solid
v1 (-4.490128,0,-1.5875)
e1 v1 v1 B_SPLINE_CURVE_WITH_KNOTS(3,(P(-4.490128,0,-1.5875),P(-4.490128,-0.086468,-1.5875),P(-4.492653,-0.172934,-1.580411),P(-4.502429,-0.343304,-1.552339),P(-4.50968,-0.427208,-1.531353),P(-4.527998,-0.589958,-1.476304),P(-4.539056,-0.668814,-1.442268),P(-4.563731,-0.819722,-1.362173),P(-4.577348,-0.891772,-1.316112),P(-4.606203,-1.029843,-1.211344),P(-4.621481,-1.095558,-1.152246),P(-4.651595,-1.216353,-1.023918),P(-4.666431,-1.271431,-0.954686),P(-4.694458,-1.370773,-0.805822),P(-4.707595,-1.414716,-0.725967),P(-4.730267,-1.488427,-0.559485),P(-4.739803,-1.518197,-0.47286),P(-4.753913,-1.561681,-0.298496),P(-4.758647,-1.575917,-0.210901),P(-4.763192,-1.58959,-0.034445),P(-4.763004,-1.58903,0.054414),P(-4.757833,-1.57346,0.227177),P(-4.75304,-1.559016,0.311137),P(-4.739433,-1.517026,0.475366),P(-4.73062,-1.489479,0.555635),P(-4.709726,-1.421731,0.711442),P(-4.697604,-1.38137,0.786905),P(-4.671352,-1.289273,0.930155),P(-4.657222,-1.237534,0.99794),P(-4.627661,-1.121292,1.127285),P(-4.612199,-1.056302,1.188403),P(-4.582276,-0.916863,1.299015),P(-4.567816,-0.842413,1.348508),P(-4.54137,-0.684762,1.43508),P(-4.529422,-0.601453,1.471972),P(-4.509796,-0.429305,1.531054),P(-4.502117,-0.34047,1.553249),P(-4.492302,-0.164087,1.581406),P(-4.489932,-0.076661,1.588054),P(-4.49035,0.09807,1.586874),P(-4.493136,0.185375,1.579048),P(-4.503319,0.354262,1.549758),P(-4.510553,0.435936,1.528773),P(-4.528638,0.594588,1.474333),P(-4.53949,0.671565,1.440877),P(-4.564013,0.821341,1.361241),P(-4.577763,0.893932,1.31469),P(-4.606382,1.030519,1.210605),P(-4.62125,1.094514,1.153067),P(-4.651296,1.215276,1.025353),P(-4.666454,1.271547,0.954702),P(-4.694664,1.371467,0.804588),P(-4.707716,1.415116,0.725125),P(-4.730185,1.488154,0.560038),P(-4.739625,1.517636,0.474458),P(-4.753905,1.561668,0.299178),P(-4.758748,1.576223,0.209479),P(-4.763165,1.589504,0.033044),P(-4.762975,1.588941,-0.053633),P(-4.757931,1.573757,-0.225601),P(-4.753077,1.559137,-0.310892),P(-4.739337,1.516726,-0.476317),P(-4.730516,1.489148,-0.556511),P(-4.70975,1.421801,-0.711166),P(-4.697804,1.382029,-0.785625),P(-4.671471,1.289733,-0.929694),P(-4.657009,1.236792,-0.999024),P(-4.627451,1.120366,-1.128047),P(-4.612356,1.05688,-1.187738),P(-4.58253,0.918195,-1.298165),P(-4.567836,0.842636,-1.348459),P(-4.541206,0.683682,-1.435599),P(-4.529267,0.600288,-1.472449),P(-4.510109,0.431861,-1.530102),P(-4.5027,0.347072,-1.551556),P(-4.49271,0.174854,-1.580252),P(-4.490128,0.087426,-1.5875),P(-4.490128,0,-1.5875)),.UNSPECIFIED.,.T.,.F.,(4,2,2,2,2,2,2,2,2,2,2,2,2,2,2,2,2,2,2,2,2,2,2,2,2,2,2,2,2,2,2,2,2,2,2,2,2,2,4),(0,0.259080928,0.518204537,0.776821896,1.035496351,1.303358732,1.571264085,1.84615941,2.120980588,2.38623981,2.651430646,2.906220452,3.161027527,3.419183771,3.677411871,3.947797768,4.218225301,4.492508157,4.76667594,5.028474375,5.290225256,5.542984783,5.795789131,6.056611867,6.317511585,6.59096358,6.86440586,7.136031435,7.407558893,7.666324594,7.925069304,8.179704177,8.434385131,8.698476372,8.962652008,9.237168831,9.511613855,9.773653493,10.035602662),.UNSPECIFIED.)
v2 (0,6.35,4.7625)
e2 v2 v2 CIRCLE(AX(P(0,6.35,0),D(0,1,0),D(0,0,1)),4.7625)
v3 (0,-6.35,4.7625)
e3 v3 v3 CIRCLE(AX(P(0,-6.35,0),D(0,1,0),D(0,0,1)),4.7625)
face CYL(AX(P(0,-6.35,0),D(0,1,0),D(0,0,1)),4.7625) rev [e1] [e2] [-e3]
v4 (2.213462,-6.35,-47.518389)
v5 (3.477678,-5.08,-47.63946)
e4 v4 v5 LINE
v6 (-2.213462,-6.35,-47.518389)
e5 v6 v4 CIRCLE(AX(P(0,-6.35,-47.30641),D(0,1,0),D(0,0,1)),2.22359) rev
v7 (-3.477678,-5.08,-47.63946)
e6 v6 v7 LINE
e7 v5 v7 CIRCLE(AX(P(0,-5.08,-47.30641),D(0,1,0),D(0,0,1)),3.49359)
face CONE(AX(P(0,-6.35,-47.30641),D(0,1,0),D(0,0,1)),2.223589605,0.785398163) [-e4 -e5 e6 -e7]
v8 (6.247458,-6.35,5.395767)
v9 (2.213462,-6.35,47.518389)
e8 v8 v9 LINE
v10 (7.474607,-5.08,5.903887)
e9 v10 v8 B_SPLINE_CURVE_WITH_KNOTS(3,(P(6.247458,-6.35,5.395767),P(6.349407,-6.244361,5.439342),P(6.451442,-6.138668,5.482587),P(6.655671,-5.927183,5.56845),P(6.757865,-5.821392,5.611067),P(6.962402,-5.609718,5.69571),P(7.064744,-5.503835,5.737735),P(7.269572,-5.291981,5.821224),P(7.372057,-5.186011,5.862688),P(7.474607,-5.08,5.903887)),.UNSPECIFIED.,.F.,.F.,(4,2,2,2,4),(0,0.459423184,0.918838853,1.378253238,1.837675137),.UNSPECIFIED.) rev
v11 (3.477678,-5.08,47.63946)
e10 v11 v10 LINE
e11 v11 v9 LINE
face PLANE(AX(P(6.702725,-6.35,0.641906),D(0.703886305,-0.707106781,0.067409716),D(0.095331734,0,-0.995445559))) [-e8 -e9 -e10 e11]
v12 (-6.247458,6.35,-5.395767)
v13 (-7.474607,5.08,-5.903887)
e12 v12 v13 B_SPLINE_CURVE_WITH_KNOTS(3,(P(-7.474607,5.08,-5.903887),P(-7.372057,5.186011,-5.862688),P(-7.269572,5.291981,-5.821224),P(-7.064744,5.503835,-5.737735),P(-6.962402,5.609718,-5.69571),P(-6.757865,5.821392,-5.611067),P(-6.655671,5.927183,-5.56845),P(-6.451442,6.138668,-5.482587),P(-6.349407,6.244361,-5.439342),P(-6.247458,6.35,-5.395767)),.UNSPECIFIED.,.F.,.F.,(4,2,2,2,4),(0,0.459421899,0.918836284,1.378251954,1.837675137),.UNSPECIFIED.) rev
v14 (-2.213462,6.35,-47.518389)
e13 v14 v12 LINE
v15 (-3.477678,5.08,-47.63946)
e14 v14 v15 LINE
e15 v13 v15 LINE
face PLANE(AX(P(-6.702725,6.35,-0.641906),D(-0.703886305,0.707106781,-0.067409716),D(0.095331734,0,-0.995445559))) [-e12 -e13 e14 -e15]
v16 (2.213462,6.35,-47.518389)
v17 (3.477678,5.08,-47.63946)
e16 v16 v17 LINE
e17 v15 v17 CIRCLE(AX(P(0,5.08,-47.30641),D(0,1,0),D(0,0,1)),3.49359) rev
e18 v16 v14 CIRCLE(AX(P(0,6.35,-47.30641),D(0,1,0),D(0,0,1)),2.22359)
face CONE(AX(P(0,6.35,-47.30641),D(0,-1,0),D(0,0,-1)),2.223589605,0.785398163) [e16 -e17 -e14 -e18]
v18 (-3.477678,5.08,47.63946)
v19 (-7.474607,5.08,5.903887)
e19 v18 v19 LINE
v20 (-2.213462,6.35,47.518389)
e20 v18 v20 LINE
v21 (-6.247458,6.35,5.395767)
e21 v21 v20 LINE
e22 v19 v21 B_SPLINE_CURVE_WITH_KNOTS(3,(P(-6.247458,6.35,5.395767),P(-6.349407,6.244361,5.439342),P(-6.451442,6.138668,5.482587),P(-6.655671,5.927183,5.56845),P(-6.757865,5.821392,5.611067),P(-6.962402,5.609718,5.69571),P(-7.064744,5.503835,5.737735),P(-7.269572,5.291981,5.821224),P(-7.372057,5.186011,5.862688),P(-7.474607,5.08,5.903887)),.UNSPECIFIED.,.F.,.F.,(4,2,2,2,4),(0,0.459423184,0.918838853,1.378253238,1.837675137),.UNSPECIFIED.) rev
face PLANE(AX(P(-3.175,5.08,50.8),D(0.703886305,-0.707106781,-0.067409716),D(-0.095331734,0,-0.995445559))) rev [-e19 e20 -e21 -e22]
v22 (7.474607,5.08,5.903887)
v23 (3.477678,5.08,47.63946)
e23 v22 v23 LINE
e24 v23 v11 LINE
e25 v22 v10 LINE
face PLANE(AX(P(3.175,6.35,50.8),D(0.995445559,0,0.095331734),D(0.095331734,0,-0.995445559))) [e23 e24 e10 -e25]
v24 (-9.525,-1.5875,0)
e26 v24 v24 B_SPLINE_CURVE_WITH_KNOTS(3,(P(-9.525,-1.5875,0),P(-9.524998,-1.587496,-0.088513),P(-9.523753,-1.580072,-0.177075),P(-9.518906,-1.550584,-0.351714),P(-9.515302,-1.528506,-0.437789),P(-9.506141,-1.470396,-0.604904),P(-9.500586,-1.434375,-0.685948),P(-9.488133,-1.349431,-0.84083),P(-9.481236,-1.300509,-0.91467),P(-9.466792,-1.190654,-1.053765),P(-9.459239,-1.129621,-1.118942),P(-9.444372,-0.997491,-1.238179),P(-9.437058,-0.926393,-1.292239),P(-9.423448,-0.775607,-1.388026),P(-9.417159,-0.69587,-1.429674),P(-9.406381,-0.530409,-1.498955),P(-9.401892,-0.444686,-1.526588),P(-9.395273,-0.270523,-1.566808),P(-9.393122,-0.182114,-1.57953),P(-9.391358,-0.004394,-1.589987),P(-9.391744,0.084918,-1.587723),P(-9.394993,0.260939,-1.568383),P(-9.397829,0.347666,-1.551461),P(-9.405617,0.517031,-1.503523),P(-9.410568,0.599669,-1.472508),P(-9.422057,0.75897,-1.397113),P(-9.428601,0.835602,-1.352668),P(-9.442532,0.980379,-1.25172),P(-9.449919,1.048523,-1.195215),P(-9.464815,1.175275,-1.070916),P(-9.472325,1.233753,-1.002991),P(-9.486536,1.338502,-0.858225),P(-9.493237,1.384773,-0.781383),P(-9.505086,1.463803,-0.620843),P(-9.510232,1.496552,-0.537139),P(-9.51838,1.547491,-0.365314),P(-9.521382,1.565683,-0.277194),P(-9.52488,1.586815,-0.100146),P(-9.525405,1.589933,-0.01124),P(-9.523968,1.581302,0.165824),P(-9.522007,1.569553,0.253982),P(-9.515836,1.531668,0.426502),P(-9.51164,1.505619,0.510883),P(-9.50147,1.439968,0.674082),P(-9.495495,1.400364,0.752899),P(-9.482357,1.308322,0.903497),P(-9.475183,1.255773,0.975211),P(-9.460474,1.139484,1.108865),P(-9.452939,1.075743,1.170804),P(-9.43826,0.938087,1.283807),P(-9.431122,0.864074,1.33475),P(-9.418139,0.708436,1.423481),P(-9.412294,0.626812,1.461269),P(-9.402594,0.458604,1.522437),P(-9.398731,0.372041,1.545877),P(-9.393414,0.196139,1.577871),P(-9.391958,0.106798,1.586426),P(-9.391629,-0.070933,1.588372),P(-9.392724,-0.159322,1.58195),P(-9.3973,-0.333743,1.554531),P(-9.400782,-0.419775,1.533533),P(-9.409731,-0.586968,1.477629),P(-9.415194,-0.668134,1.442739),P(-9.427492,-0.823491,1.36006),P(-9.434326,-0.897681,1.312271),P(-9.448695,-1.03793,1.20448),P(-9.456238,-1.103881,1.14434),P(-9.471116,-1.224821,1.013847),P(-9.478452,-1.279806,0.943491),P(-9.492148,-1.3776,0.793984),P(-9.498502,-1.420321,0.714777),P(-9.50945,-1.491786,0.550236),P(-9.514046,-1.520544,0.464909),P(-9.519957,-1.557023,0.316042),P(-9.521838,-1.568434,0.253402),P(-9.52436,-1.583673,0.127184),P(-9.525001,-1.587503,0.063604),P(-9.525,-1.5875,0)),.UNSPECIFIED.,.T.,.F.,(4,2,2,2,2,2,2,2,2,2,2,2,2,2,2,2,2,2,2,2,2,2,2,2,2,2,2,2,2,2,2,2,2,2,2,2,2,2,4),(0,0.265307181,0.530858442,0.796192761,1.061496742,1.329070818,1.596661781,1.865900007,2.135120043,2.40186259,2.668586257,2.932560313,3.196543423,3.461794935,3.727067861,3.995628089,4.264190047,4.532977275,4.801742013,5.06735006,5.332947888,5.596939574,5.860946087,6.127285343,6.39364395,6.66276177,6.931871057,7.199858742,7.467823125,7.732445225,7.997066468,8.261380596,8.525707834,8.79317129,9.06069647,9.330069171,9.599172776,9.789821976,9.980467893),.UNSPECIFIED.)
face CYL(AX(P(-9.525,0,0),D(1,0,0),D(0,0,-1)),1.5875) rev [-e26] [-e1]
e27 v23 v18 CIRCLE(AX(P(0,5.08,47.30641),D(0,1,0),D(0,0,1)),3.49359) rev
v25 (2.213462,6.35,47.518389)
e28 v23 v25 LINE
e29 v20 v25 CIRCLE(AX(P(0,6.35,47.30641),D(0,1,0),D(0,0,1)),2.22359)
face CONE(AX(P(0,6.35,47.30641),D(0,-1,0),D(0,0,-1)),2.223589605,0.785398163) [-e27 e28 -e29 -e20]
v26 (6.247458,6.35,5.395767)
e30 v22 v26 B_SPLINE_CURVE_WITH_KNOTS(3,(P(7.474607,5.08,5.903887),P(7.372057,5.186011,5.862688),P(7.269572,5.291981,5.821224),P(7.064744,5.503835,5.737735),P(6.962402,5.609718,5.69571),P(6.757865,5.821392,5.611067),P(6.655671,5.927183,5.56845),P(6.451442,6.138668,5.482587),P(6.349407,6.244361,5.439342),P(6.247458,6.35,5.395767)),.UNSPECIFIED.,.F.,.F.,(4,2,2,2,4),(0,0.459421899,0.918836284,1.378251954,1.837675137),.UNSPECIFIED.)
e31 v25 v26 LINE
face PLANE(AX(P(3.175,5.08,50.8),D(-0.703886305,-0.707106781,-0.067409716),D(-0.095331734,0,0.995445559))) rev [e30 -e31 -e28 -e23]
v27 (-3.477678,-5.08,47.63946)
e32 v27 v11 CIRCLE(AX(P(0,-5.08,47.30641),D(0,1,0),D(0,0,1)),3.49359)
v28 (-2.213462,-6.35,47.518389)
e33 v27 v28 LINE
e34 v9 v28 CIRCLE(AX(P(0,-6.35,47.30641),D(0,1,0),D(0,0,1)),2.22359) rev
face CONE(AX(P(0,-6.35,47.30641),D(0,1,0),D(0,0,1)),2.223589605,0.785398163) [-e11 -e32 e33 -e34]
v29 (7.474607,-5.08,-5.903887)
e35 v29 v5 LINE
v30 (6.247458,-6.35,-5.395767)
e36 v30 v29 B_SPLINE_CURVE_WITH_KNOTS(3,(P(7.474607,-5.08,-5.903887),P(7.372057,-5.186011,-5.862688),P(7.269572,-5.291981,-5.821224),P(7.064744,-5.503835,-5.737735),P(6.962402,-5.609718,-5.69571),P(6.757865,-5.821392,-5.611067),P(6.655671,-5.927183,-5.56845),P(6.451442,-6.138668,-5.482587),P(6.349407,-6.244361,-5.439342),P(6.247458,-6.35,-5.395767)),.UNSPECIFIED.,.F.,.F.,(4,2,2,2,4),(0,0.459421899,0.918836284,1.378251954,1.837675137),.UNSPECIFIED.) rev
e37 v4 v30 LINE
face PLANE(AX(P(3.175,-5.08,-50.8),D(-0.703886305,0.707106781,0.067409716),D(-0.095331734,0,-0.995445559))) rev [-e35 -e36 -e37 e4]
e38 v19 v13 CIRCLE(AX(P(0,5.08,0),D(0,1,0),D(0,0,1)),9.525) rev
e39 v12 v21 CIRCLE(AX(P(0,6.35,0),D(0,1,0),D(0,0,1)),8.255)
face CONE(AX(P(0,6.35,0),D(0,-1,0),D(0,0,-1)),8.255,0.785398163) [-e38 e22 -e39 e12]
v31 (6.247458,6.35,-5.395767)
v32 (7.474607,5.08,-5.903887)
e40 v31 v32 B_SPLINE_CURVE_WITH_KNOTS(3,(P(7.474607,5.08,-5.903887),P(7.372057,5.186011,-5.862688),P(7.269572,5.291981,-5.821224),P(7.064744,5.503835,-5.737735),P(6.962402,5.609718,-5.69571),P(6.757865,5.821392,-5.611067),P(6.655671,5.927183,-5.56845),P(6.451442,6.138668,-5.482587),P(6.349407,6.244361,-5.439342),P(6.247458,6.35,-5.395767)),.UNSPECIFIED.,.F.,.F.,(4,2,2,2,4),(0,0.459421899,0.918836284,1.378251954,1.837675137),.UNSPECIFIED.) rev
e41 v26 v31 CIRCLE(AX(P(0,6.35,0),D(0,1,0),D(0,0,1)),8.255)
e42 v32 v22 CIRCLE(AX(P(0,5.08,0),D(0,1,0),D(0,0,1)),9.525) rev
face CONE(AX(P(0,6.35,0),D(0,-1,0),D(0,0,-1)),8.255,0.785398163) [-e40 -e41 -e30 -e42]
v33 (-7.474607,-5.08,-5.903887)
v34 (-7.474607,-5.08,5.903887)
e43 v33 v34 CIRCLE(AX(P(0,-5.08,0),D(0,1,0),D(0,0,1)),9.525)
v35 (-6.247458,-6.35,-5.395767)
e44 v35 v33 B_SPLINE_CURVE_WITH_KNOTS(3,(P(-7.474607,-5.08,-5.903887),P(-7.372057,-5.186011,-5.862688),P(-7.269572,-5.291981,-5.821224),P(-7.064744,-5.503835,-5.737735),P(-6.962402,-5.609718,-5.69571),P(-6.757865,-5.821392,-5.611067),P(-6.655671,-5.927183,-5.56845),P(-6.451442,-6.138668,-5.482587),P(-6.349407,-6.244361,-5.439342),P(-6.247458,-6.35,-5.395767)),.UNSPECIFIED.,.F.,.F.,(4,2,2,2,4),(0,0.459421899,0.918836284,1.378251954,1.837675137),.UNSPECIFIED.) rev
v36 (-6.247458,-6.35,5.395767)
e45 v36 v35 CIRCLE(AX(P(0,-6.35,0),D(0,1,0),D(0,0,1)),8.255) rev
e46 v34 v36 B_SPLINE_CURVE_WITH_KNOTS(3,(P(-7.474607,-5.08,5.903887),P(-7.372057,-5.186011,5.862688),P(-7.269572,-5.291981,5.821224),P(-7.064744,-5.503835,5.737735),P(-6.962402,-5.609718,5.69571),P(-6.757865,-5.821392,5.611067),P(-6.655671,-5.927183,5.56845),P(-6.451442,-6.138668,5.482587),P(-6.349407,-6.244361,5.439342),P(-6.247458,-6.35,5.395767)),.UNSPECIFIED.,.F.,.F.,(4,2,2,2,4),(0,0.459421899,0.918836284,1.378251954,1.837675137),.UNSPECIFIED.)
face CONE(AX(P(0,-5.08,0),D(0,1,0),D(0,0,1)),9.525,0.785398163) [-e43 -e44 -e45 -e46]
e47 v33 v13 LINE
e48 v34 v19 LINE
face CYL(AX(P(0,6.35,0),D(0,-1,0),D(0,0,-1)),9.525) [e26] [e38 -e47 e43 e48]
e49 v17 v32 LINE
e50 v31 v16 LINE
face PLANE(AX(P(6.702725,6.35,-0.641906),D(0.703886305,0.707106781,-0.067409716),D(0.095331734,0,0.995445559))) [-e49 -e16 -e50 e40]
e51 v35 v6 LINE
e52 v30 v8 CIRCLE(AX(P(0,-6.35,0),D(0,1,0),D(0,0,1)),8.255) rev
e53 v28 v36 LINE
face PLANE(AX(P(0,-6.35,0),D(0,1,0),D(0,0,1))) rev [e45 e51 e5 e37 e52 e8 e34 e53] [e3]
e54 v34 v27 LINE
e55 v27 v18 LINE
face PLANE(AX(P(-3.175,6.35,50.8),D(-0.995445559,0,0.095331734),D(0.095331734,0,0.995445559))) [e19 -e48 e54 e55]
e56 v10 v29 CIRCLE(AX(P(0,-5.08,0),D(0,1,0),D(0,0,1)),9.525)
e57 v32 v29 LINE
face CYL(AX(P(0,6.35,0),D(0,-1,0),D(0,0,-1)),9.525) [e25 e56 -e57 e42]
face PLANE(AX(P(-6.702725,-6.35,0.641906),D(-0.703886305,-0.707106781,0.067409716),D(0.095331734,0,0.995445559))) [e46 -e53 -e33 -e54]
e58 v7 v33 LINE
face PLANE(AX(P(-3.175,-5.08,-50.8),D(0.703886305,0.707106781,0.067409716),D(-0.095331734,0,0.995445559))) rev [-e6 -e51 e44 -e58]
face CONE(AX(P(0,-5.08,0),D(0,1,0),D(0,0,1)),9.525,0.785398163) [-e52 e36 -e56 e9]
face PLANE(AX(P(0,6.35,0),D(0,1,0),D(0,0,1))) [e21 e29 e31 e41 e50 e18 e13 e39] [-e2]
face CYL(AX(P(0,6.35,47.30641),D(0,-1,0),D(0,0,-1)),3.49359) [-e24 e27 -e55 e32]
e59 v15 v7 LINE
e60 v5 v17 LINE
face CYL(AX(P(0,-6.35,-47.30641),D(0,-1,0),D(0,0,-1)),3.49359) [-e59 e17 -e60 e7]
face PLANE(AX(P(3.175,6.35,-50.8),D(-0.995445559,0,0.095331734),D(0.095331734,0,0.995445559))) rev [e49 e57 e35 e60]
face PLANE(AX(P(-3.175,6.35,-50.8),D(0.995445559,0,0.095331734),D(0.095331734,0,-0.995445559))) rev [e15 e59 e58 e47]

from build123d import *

# Parameters (mm, degrees)
SKETCH1_R               = 9.525
BOSS_EXTRUDE1_DEPTH     = 6.35
BOSS_EXTRUDE2_DEPTH     = 6.35
FILLET1_R               = 3.49359
FILLET1_OF_MIRROR2_R    = 3.49359
CHAMFER1_SIZE           = 1.27
CUT_EXTRUDE1_DEPTH      = 53.073871807
CUT_EXTRUDE1_DEPTH_BACK = 53.073871807
SKETCH1_3_R             = 4.7625
SKETCH3_R               = 1.5875
CUT_EXTRUDE2_DEPTH      = 53.073871807


with BuildPart() as part:
    # Sketch1 → Boss-Extrude1 (new, symmetric)
    with BuildSketch(Plane(origin=(0, 0, 0), x_dir=(1, 0, 0), z_dir=(0, 1, 0))):
        with Locations(Location((0, 0, 0), (0, 0, 270))):
            Circle(SKETCH1_R)
    extrude(amount=BOSS_EXTRUDE1_DEPTH, both=True)

    # Sketch2 → Boss-Extrude2 (add, symmetric)
    with BuildSketch(Plane(origin=(0, 0, 0), x_dir=(1, 0, 0), z_dir=(0, 1, 0))):
        Polygon((-8.040009509, 0), (8.040009509, 0), (3.175, 50.8), (-3.175, 50.8), align=None)
    boss_extrude2 = extrude(amount=BOSS_EXTRUDE2_DEPTH, both=True)

    # Fillet1
    fillet1_edges = [part.edges().sort_by_distance(p)[0] for p in [
        (-3.175, 0, -50.8),
        (3.175, 0, -50.8),
    ]]
    fillet(fillet1_edges, radius=FILLET1_R - 0.0001)  # a hair under: the kernel refuses the full size

    # Mirror2: Boss-Extrude2 across plane
    add(boss_extrude2.mirror(Plane.XY))

    # Fillet1 of Mirror2
    fillet1_of_mirror2_edges = [part.edges().sort_by_distance(p)[0] for p in [
        (-3.175, 0, 50.8),
        (3.175, 0, 50.8),
    ]]
    fillet(fillet1_of_mirror2_edges, radius=FILLET1_OF_MIRROR2_R - 0.0001)  # a hair under: the kernel refuses the full size

    # Chamfer1
    chamfer1_edges = [part.edges().sort_by_distance(p)[0] for p in [
        (5.476138131, -6.35, -26.771718685),
        (5.476138131, 6.35, -26.771718685),
        (-5.476138131, -6.35, -26.771718685),
        (-5.476138131, 6.35, -26.771718685),
        (0, -6.35, -50.8),
        (0, 6.35, -50.8),
        (9.525, -6.35, 0),
        (9.525, 6.35, 0),
        (5.476138131, 6.35, 26.771718685),
        (5.476138131, -6.35, 26.771718685),
        (-9.525, -6.35, 0),
        (-5.476138131, -6.35, 26.771718685),
        (-5.476138131, 6.35, 26.771718685),
        (0, 6.35, 50.8),
        (0, -6.35, 50.8),
        (-9.525, 6.35, 0),
    ]]
    chamfer(chamfer1_edges, length=CHAMFER1_SIZE)

    # Sketch1<3> → Cut-Extrude1 (cut, two sides: drawn at the far end of the back side and taken through both)
    with BuildSketch(Plane(origin=(0, 0, 0), x_dir=(1, 0, 0), z_dir=(0, 1, 0)).offset(-CUT_EXTRUDE1_DEPTH_BACK)):
        with Locations(Location((0, 0, 0), (0, 0, 270))):
            Circle(SKETCH1_3_R)
    extrude(amount=CUT_EXTRUDE1_DEPTH + CUT_EXTRUDE1_DEPTH_BACK, mode=Mode.SUBTRACT)

    # Sketch3 → Cut-Extrude2 (cut, through all)
    with BuildSketch(Plane(origin=(0, 0, 0), x_dir=(0, 0, -1), z_dir=(1, 0, 0))):
        Circle(SKETCH3_R)
    extrude(amount=-CUT_EXTRUDE2_DEPTH, mode=Mode.SUBTRACT)


solid = part.part
